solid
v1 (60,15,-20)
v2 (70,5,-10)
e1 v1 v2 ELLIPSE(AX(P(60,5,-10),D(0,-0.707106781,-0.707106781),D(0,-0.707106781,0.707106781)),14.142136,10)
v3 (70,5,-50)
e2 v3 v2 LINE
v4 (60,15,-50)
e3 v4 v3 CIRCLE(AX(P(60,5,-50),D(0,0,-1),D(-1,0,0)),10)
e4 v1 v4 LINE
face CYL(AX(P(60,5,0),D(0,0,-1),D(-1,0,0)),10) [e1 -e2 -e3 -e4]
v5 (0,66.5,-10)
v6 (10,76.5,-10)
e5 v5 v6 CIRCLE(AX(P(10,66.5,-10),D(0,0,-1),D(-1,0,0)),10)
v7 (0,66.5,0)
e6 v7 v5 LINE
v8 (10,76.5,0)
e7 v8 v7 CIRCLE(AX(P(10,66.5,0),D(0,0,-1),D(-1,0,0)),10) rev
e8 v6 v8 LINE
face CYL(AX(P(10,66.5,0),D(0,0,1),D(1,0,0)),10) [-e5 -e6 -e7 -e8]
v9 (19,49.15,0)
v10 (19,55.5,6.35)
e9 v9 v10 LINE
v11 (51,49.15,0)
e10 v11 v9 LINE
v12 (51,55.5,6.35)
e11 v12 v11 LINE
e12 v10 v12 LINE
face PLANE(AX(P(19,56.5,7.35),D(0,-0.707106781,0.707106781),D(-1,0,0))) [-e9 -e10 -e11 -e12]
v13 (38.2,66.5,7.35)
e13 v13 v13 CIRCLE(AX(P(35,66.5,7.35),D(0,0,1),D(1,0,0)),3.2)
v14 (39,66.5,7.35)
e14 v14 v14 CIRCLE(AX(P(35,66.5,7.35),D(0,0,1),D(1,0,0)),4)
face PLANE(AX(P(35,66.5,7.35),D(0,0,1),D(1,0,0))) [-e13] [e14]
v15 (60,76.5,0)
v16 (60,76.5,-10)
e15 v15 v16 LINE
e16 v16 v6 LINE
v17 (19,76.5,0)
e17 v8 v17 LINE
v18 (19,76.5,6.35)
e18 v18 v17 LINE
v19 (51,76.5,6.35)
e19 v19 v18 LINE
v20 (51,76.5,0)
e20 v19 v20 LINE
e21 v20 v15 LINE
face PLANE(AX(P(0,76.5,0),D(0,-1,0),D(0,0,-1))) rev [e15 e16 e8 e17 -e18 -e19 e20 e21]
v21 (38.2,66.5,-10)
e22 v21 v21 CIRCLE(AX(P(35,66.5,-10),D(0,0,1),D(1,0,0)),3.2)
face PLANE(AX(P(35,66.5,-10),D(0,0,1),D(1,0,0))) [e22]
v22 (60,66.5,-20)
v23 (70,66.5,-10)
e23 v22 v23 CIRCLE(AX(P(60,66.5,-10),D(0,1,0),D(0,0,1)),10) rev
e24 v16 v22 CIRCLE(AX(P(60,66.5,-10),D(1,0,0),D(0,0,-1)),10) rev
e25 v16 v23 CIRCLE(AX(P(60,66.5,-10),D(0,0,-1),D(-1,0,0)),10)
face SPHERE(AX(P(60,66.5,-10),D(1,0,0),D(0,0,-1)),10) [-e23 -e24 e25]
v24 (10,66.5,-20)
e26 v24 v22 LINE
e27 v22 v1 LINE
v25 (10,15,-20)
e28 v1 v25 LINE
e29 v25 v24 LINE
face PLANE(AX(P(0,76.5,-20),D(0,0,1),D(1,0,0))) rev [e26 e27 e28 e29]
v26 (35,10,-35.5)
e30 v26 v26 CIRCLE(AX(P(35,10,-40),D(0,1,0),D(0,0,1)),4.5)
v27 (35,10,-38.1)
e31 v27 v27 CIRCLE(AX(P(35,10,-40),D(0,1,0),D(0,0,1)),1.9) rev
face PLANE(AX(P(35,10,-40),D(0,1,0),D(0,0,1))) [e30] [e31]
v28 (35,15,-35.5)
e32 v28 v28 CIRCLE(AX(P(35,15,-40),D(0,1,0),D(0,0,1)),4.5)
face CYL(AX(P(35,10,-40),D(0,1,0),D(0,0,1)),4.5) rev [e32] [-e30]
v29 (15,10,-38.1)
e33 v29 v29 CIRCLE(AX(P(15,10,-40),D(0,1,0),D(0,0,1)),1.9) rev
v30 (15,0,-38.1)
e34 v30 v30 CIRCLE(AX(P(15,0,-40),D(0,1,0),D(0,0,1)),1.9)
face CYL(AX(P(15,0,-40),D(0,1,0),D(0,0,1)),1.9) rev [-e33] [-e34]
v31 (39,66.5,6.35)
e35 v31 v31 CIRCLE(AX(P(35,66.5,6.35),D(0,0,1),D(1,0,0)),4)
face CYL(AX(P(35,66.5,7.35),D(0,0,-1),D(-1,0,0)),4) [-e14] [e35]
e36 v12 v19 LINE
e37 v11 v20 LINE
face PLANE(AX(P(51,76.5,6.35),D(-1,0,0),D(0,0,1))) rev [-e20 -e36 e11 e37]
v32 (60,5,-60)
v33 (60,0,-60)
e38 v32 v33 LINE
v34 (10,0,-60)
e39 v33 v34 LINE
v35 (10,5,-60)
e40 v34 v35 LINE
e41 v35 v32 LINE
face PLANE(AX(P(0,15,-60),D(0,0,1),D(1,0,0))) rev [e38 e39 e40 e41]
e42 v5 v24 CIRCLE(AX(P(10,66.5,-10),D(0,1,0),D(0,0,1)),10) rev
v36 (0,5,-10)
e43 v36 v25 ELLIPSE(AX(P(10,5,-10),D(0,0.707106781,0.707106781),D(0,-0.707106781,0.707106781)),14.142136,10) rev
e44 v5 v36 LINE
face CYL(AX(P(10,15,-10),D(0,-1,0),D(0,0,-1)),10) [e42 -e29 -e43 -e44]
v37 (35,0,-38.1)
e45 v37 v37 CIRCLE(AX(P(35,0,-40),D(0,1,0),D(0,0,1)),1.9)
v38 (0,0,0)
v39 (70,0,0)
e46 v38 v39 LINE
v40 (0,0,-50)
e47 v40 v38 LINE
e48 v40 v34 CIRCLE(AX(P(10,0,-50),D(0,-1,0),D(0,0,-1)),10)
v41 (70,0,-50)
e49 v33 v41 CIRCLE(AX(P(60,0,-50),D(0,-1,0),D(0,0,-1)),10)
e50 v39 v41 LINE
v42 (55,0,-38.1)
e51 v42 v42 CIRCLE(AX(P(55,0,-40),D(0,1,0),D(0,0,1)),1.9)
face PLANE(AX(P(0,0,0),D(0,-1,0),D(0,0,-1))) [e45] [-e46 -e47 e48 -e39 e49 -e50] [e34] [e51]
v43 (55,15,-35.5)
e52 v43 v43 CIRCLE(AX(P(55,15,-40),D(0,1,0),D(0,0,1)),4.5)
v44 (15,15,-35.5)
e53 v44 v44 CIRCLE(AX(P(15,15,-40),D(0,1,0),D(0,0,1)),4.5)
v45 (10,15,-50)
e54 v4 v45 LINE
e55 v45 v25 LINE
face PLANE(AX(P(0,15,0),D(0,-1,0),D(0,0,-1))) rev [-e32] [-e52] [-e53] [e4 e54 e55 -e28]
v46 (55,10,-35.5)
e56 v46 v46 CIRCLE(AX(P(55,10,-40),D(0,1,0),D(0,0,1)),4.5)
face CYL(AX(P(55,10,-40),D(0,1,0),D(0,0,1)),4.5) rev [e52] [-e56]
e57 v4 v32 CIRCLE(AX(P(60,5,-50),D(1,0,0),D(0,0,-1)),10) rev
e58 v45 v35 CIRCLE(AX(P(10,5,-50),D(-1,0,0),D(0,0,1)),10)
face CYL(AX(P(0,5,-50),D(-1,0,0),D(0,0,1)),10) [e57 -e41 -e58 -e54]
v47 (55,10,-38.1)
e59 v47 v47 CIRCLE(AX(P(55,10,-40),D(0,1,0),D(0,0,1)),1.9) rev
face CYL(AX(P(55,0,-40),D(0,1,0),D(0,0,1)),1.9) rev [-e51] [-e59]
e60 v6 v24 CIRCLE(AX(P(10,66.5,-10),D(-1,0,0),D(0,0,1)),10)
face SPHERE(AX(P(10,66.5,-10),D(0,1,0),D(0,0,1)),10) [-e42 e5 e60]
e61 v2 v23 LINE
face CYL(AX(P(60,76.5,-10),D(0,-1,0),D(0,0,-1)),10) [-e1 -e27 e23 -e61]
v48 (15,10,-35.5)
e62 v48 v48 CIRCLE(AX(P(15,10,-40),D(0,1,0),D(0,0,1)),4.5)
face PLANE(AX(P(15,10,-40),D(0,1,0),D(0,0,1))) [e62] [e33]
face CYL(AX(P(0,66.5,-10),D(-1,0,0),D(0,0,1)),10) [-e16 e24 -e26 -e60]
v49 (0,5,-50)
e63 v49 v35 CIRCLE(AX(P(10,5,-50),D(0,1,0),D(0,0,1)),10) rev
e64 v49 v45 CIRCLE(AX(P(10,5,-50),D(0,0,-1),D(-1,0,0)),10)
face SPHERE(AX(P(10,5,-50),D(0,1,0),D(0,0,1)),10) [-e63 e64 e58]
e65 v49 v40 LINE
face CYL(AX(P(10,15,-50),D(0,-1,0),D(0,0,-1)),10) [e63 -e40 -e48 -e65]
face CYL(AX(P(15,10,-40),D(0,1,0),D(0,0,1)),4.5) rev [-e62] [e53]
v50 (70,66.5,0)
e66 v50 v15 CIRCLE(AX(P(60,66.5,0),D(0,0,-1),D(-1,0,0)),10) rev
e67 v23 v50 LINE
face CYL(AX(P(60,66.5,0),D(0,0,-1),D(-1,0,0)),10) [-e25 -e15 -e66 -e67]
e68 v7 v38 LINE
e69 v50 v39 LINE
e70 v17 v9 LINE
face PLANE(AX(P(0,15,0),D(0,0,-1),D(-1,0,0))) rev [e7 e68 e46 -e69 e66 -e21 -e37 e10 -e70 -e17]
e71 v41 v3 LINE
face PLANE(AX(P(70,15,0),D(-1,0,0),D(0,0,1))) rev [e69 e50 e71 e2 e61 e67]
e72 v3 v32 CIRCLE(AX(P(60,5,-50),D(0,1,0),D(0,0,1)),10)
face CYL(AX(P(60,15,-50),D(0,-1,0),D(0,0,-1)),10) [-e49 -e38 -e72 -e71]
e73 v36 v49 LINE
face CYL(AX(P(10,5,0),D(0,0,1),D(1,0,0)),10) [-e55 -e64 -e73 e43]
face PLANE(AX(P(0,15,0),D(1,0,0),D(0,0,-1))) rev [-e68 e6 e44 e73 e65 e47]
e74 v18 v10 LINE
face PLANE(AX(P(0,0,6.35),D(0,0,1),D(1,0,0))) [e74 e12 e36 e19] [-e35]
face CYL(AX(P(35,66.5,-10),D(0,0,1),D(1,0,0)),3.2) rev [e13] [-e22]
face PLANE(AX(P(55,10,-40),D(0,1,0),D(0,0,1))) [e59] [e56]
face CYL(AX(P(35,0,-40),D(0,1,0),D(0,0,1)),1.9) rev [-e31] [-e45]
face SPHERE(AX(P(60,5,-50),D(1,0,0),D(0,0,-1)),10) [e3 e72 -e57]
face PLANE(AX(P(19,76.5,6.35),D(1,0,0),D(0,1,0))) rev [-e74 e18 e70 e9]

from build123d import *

# Parameters (mm, degrees)
SKETCH1_W           = 70
SKETCH1_H           = 60
BOSS_EXTRUDE1_DEPTH = 15
SKETCH2_W           = 70
SKETCH2_H           = 20
BOSS_EXTRUDE2_DEPTH = 61.5
SKETCH3_R           = 3.2
CUT_EXTRUDE1_DEPTH  = 10
SKETCH5_R           = 1.9
CUT_EXTRUDE2_DEPTH  = 111.825312993
SKETCH6_R           = 4.5
CUT_EXTRUDE3_DEPTH  = 5
FILLET1_R           = 10
BOSS_EXTRUDE3_START = 6.35
SKETCH7_W           = 32
SKETCH7_H           = 20
SKETCH7_R           = 3.2
BOSS_EXTRUDE3_DEPTH = 6.35
CHAMFER1_SIZE       = 7.35
BOSS_EXTRUDE4_START = 1
SKETCH8_R           = 4
SKETCH8_R_2         = 3.2
BOSS_EXTRUDE4_DEPTH = 1


with BuildPart() as part:
    # Sketch1 → Boss-Extrude1 (new body)
    with BuildSketch(Plane(origin=(0, 0, 0), x_dir=(1, 0, 0), z_dir=(0, 1, 0))):
        with Locations((35, 30)):
            Rectangle(SKETCH1_W, SKETCH1_H)
    extrude(amount=BOSS_EXTRUDE1_DEPTH)

    # Sketch2 → Boss-Extrude2 (add)
    with BuildSketch(Plane(origin=(0, 15, 0), x_dir=(1, 0, 0), z_dir=(0, 1, 0))):
        with Locations((35, 10)):
            Rectangle(SKETCH2_W, SKETCH2_H)
    extrude(amount=BOSS_EXTRUDE2_DEPTH)

    # Sketch3 → Cut-Extrude1 (cut)
    with BuildSketch(Plane.XY):
        with Locations((35, 66.5)):
            Circle(SKETCH3_R)
    extrude(amount=-CUT_EXTRUDE1_DEPTH, mode=Mode.SUBTRACT)

    # Sketch5 → Cut-Extrude2 (cut, through all)
    with BuildSketch(Plane(origin=(0, 15, 0), x_dir=(1, 0, 0), z_dir=(0, 1, 0))):
        with Locations(Location((15, 40, 0), (0, 0, 270))):
            Circle(SKETCH5_R)
        with Locations(Location((35, 40, 0), (0, 0, 270))):
            Circle(SKETCH5_R)
        with Locations(Location((55, 40, 0), (0, 0, 270))):
            Circle(SKETCH5_R)
    extrude(amount=-CUT_EXTRUDE2_DEPTH, mode=Mode.SUBTRACT)

    # Sketch6 → Cut-Extrude3 (cut)
    with BuildSketch(Plane(origin=(0, 15, 0), x_dir=(1, 0, 0), z_dir=(0, 1, 0))):
        with Locations(Location((15, 40, 0), (0, 0, 270))):
            Circle(SKETCH6_R)
        with Locations(Location((35, 40, 0), (0, 0, 270))):
            Circle(SKETCH6_R)
        with Locations(Location((55, 40, 0), (0, 0, 270))):
            Circle(SKETCH6_R)
    extrude(amount=-CUT_EXTRUDE3_DEPTH, mode=Mode.SUBTRACT)

    # Fillet1
    fillet1_edges = [part.edges().sort_by_distance(p)[0] for p in [
        (70, 15, -40),
        (0, 45.75, -20),
        (35, 15, -60),
        (70, 45.75, -20),
        (0, 76.5, -10),
        (70, 76.5, -10),
        (35, 76.5, -20),
        (0, 15, -40),
        (0, 7.5, -60),
        (70, 7.5, -60),
    ]]
    fillet(fillet1_edges, radius=FILLET1_R)

    # Sketch7 → Boss-Extrude3 (add)
    with BuildSketch(Plane.XY.offset(BOSS_EXTRUDE3_START)):
        with Locations((35, 66.5)):
            Rectangle(SKETCH7_W, SKETCH7_H)
        with Locations((35, 66.5)):
            Circle(SKETCH7_R, mode=Mode.SUBTRACT)
    extrude(amount=-BOSS_EXTRUDE3_DEPTH)

    # Chamfer1
    # the kernel refuses this chamfer: 7.35 mm, written as the material it adds along each edge
    with BuildSketch(Plane(origin=(51, 56.5, 0), x_dir=(0, -0.9996219169112966, -0.027495876610586365), z_dir=(-1, 0, 0))) as chamfer1_piece_1_section:
        Polygon((CHAMFER1_SIZE * 0.999621916911, CHAMFER1_SIZE * 0.0274958766106), (-CHAMFER1_SIZE * 0.0274958766106, CHAMFER1_SIZE * 0.999621916911), (0, 0), align=None)
    chamfer1_piece_1 = extrude(amount=32, mode=Mode.PRIVATE)
    chamfer1_piece_1 = split(chamfer1_piece_1, bisect_by=Plane(origin=(35, 54.008386108, 6.35), z_dir=(0, 0, -1)), keep=Keep.TOP, mode=Mode.PRIVATE)
    add(chamfer1_piece_1)

    # Sketch8 → Boss-Extrude4 (add)
    with BuildSketch(Plane.XY.offset(6.35).offset(BOSS_EXTRUDE4_START)):
        with Locations((35, 66.5)):
            Circle(SKETCH8_R)
        with Locations((35, 66.5)):
            Circle(SKETCH8_R_2, mode=Mode.SUBTRACT)
    extrude(amount=-BOSS_EXTRUDE4_DEPTH)


solid = part.part
